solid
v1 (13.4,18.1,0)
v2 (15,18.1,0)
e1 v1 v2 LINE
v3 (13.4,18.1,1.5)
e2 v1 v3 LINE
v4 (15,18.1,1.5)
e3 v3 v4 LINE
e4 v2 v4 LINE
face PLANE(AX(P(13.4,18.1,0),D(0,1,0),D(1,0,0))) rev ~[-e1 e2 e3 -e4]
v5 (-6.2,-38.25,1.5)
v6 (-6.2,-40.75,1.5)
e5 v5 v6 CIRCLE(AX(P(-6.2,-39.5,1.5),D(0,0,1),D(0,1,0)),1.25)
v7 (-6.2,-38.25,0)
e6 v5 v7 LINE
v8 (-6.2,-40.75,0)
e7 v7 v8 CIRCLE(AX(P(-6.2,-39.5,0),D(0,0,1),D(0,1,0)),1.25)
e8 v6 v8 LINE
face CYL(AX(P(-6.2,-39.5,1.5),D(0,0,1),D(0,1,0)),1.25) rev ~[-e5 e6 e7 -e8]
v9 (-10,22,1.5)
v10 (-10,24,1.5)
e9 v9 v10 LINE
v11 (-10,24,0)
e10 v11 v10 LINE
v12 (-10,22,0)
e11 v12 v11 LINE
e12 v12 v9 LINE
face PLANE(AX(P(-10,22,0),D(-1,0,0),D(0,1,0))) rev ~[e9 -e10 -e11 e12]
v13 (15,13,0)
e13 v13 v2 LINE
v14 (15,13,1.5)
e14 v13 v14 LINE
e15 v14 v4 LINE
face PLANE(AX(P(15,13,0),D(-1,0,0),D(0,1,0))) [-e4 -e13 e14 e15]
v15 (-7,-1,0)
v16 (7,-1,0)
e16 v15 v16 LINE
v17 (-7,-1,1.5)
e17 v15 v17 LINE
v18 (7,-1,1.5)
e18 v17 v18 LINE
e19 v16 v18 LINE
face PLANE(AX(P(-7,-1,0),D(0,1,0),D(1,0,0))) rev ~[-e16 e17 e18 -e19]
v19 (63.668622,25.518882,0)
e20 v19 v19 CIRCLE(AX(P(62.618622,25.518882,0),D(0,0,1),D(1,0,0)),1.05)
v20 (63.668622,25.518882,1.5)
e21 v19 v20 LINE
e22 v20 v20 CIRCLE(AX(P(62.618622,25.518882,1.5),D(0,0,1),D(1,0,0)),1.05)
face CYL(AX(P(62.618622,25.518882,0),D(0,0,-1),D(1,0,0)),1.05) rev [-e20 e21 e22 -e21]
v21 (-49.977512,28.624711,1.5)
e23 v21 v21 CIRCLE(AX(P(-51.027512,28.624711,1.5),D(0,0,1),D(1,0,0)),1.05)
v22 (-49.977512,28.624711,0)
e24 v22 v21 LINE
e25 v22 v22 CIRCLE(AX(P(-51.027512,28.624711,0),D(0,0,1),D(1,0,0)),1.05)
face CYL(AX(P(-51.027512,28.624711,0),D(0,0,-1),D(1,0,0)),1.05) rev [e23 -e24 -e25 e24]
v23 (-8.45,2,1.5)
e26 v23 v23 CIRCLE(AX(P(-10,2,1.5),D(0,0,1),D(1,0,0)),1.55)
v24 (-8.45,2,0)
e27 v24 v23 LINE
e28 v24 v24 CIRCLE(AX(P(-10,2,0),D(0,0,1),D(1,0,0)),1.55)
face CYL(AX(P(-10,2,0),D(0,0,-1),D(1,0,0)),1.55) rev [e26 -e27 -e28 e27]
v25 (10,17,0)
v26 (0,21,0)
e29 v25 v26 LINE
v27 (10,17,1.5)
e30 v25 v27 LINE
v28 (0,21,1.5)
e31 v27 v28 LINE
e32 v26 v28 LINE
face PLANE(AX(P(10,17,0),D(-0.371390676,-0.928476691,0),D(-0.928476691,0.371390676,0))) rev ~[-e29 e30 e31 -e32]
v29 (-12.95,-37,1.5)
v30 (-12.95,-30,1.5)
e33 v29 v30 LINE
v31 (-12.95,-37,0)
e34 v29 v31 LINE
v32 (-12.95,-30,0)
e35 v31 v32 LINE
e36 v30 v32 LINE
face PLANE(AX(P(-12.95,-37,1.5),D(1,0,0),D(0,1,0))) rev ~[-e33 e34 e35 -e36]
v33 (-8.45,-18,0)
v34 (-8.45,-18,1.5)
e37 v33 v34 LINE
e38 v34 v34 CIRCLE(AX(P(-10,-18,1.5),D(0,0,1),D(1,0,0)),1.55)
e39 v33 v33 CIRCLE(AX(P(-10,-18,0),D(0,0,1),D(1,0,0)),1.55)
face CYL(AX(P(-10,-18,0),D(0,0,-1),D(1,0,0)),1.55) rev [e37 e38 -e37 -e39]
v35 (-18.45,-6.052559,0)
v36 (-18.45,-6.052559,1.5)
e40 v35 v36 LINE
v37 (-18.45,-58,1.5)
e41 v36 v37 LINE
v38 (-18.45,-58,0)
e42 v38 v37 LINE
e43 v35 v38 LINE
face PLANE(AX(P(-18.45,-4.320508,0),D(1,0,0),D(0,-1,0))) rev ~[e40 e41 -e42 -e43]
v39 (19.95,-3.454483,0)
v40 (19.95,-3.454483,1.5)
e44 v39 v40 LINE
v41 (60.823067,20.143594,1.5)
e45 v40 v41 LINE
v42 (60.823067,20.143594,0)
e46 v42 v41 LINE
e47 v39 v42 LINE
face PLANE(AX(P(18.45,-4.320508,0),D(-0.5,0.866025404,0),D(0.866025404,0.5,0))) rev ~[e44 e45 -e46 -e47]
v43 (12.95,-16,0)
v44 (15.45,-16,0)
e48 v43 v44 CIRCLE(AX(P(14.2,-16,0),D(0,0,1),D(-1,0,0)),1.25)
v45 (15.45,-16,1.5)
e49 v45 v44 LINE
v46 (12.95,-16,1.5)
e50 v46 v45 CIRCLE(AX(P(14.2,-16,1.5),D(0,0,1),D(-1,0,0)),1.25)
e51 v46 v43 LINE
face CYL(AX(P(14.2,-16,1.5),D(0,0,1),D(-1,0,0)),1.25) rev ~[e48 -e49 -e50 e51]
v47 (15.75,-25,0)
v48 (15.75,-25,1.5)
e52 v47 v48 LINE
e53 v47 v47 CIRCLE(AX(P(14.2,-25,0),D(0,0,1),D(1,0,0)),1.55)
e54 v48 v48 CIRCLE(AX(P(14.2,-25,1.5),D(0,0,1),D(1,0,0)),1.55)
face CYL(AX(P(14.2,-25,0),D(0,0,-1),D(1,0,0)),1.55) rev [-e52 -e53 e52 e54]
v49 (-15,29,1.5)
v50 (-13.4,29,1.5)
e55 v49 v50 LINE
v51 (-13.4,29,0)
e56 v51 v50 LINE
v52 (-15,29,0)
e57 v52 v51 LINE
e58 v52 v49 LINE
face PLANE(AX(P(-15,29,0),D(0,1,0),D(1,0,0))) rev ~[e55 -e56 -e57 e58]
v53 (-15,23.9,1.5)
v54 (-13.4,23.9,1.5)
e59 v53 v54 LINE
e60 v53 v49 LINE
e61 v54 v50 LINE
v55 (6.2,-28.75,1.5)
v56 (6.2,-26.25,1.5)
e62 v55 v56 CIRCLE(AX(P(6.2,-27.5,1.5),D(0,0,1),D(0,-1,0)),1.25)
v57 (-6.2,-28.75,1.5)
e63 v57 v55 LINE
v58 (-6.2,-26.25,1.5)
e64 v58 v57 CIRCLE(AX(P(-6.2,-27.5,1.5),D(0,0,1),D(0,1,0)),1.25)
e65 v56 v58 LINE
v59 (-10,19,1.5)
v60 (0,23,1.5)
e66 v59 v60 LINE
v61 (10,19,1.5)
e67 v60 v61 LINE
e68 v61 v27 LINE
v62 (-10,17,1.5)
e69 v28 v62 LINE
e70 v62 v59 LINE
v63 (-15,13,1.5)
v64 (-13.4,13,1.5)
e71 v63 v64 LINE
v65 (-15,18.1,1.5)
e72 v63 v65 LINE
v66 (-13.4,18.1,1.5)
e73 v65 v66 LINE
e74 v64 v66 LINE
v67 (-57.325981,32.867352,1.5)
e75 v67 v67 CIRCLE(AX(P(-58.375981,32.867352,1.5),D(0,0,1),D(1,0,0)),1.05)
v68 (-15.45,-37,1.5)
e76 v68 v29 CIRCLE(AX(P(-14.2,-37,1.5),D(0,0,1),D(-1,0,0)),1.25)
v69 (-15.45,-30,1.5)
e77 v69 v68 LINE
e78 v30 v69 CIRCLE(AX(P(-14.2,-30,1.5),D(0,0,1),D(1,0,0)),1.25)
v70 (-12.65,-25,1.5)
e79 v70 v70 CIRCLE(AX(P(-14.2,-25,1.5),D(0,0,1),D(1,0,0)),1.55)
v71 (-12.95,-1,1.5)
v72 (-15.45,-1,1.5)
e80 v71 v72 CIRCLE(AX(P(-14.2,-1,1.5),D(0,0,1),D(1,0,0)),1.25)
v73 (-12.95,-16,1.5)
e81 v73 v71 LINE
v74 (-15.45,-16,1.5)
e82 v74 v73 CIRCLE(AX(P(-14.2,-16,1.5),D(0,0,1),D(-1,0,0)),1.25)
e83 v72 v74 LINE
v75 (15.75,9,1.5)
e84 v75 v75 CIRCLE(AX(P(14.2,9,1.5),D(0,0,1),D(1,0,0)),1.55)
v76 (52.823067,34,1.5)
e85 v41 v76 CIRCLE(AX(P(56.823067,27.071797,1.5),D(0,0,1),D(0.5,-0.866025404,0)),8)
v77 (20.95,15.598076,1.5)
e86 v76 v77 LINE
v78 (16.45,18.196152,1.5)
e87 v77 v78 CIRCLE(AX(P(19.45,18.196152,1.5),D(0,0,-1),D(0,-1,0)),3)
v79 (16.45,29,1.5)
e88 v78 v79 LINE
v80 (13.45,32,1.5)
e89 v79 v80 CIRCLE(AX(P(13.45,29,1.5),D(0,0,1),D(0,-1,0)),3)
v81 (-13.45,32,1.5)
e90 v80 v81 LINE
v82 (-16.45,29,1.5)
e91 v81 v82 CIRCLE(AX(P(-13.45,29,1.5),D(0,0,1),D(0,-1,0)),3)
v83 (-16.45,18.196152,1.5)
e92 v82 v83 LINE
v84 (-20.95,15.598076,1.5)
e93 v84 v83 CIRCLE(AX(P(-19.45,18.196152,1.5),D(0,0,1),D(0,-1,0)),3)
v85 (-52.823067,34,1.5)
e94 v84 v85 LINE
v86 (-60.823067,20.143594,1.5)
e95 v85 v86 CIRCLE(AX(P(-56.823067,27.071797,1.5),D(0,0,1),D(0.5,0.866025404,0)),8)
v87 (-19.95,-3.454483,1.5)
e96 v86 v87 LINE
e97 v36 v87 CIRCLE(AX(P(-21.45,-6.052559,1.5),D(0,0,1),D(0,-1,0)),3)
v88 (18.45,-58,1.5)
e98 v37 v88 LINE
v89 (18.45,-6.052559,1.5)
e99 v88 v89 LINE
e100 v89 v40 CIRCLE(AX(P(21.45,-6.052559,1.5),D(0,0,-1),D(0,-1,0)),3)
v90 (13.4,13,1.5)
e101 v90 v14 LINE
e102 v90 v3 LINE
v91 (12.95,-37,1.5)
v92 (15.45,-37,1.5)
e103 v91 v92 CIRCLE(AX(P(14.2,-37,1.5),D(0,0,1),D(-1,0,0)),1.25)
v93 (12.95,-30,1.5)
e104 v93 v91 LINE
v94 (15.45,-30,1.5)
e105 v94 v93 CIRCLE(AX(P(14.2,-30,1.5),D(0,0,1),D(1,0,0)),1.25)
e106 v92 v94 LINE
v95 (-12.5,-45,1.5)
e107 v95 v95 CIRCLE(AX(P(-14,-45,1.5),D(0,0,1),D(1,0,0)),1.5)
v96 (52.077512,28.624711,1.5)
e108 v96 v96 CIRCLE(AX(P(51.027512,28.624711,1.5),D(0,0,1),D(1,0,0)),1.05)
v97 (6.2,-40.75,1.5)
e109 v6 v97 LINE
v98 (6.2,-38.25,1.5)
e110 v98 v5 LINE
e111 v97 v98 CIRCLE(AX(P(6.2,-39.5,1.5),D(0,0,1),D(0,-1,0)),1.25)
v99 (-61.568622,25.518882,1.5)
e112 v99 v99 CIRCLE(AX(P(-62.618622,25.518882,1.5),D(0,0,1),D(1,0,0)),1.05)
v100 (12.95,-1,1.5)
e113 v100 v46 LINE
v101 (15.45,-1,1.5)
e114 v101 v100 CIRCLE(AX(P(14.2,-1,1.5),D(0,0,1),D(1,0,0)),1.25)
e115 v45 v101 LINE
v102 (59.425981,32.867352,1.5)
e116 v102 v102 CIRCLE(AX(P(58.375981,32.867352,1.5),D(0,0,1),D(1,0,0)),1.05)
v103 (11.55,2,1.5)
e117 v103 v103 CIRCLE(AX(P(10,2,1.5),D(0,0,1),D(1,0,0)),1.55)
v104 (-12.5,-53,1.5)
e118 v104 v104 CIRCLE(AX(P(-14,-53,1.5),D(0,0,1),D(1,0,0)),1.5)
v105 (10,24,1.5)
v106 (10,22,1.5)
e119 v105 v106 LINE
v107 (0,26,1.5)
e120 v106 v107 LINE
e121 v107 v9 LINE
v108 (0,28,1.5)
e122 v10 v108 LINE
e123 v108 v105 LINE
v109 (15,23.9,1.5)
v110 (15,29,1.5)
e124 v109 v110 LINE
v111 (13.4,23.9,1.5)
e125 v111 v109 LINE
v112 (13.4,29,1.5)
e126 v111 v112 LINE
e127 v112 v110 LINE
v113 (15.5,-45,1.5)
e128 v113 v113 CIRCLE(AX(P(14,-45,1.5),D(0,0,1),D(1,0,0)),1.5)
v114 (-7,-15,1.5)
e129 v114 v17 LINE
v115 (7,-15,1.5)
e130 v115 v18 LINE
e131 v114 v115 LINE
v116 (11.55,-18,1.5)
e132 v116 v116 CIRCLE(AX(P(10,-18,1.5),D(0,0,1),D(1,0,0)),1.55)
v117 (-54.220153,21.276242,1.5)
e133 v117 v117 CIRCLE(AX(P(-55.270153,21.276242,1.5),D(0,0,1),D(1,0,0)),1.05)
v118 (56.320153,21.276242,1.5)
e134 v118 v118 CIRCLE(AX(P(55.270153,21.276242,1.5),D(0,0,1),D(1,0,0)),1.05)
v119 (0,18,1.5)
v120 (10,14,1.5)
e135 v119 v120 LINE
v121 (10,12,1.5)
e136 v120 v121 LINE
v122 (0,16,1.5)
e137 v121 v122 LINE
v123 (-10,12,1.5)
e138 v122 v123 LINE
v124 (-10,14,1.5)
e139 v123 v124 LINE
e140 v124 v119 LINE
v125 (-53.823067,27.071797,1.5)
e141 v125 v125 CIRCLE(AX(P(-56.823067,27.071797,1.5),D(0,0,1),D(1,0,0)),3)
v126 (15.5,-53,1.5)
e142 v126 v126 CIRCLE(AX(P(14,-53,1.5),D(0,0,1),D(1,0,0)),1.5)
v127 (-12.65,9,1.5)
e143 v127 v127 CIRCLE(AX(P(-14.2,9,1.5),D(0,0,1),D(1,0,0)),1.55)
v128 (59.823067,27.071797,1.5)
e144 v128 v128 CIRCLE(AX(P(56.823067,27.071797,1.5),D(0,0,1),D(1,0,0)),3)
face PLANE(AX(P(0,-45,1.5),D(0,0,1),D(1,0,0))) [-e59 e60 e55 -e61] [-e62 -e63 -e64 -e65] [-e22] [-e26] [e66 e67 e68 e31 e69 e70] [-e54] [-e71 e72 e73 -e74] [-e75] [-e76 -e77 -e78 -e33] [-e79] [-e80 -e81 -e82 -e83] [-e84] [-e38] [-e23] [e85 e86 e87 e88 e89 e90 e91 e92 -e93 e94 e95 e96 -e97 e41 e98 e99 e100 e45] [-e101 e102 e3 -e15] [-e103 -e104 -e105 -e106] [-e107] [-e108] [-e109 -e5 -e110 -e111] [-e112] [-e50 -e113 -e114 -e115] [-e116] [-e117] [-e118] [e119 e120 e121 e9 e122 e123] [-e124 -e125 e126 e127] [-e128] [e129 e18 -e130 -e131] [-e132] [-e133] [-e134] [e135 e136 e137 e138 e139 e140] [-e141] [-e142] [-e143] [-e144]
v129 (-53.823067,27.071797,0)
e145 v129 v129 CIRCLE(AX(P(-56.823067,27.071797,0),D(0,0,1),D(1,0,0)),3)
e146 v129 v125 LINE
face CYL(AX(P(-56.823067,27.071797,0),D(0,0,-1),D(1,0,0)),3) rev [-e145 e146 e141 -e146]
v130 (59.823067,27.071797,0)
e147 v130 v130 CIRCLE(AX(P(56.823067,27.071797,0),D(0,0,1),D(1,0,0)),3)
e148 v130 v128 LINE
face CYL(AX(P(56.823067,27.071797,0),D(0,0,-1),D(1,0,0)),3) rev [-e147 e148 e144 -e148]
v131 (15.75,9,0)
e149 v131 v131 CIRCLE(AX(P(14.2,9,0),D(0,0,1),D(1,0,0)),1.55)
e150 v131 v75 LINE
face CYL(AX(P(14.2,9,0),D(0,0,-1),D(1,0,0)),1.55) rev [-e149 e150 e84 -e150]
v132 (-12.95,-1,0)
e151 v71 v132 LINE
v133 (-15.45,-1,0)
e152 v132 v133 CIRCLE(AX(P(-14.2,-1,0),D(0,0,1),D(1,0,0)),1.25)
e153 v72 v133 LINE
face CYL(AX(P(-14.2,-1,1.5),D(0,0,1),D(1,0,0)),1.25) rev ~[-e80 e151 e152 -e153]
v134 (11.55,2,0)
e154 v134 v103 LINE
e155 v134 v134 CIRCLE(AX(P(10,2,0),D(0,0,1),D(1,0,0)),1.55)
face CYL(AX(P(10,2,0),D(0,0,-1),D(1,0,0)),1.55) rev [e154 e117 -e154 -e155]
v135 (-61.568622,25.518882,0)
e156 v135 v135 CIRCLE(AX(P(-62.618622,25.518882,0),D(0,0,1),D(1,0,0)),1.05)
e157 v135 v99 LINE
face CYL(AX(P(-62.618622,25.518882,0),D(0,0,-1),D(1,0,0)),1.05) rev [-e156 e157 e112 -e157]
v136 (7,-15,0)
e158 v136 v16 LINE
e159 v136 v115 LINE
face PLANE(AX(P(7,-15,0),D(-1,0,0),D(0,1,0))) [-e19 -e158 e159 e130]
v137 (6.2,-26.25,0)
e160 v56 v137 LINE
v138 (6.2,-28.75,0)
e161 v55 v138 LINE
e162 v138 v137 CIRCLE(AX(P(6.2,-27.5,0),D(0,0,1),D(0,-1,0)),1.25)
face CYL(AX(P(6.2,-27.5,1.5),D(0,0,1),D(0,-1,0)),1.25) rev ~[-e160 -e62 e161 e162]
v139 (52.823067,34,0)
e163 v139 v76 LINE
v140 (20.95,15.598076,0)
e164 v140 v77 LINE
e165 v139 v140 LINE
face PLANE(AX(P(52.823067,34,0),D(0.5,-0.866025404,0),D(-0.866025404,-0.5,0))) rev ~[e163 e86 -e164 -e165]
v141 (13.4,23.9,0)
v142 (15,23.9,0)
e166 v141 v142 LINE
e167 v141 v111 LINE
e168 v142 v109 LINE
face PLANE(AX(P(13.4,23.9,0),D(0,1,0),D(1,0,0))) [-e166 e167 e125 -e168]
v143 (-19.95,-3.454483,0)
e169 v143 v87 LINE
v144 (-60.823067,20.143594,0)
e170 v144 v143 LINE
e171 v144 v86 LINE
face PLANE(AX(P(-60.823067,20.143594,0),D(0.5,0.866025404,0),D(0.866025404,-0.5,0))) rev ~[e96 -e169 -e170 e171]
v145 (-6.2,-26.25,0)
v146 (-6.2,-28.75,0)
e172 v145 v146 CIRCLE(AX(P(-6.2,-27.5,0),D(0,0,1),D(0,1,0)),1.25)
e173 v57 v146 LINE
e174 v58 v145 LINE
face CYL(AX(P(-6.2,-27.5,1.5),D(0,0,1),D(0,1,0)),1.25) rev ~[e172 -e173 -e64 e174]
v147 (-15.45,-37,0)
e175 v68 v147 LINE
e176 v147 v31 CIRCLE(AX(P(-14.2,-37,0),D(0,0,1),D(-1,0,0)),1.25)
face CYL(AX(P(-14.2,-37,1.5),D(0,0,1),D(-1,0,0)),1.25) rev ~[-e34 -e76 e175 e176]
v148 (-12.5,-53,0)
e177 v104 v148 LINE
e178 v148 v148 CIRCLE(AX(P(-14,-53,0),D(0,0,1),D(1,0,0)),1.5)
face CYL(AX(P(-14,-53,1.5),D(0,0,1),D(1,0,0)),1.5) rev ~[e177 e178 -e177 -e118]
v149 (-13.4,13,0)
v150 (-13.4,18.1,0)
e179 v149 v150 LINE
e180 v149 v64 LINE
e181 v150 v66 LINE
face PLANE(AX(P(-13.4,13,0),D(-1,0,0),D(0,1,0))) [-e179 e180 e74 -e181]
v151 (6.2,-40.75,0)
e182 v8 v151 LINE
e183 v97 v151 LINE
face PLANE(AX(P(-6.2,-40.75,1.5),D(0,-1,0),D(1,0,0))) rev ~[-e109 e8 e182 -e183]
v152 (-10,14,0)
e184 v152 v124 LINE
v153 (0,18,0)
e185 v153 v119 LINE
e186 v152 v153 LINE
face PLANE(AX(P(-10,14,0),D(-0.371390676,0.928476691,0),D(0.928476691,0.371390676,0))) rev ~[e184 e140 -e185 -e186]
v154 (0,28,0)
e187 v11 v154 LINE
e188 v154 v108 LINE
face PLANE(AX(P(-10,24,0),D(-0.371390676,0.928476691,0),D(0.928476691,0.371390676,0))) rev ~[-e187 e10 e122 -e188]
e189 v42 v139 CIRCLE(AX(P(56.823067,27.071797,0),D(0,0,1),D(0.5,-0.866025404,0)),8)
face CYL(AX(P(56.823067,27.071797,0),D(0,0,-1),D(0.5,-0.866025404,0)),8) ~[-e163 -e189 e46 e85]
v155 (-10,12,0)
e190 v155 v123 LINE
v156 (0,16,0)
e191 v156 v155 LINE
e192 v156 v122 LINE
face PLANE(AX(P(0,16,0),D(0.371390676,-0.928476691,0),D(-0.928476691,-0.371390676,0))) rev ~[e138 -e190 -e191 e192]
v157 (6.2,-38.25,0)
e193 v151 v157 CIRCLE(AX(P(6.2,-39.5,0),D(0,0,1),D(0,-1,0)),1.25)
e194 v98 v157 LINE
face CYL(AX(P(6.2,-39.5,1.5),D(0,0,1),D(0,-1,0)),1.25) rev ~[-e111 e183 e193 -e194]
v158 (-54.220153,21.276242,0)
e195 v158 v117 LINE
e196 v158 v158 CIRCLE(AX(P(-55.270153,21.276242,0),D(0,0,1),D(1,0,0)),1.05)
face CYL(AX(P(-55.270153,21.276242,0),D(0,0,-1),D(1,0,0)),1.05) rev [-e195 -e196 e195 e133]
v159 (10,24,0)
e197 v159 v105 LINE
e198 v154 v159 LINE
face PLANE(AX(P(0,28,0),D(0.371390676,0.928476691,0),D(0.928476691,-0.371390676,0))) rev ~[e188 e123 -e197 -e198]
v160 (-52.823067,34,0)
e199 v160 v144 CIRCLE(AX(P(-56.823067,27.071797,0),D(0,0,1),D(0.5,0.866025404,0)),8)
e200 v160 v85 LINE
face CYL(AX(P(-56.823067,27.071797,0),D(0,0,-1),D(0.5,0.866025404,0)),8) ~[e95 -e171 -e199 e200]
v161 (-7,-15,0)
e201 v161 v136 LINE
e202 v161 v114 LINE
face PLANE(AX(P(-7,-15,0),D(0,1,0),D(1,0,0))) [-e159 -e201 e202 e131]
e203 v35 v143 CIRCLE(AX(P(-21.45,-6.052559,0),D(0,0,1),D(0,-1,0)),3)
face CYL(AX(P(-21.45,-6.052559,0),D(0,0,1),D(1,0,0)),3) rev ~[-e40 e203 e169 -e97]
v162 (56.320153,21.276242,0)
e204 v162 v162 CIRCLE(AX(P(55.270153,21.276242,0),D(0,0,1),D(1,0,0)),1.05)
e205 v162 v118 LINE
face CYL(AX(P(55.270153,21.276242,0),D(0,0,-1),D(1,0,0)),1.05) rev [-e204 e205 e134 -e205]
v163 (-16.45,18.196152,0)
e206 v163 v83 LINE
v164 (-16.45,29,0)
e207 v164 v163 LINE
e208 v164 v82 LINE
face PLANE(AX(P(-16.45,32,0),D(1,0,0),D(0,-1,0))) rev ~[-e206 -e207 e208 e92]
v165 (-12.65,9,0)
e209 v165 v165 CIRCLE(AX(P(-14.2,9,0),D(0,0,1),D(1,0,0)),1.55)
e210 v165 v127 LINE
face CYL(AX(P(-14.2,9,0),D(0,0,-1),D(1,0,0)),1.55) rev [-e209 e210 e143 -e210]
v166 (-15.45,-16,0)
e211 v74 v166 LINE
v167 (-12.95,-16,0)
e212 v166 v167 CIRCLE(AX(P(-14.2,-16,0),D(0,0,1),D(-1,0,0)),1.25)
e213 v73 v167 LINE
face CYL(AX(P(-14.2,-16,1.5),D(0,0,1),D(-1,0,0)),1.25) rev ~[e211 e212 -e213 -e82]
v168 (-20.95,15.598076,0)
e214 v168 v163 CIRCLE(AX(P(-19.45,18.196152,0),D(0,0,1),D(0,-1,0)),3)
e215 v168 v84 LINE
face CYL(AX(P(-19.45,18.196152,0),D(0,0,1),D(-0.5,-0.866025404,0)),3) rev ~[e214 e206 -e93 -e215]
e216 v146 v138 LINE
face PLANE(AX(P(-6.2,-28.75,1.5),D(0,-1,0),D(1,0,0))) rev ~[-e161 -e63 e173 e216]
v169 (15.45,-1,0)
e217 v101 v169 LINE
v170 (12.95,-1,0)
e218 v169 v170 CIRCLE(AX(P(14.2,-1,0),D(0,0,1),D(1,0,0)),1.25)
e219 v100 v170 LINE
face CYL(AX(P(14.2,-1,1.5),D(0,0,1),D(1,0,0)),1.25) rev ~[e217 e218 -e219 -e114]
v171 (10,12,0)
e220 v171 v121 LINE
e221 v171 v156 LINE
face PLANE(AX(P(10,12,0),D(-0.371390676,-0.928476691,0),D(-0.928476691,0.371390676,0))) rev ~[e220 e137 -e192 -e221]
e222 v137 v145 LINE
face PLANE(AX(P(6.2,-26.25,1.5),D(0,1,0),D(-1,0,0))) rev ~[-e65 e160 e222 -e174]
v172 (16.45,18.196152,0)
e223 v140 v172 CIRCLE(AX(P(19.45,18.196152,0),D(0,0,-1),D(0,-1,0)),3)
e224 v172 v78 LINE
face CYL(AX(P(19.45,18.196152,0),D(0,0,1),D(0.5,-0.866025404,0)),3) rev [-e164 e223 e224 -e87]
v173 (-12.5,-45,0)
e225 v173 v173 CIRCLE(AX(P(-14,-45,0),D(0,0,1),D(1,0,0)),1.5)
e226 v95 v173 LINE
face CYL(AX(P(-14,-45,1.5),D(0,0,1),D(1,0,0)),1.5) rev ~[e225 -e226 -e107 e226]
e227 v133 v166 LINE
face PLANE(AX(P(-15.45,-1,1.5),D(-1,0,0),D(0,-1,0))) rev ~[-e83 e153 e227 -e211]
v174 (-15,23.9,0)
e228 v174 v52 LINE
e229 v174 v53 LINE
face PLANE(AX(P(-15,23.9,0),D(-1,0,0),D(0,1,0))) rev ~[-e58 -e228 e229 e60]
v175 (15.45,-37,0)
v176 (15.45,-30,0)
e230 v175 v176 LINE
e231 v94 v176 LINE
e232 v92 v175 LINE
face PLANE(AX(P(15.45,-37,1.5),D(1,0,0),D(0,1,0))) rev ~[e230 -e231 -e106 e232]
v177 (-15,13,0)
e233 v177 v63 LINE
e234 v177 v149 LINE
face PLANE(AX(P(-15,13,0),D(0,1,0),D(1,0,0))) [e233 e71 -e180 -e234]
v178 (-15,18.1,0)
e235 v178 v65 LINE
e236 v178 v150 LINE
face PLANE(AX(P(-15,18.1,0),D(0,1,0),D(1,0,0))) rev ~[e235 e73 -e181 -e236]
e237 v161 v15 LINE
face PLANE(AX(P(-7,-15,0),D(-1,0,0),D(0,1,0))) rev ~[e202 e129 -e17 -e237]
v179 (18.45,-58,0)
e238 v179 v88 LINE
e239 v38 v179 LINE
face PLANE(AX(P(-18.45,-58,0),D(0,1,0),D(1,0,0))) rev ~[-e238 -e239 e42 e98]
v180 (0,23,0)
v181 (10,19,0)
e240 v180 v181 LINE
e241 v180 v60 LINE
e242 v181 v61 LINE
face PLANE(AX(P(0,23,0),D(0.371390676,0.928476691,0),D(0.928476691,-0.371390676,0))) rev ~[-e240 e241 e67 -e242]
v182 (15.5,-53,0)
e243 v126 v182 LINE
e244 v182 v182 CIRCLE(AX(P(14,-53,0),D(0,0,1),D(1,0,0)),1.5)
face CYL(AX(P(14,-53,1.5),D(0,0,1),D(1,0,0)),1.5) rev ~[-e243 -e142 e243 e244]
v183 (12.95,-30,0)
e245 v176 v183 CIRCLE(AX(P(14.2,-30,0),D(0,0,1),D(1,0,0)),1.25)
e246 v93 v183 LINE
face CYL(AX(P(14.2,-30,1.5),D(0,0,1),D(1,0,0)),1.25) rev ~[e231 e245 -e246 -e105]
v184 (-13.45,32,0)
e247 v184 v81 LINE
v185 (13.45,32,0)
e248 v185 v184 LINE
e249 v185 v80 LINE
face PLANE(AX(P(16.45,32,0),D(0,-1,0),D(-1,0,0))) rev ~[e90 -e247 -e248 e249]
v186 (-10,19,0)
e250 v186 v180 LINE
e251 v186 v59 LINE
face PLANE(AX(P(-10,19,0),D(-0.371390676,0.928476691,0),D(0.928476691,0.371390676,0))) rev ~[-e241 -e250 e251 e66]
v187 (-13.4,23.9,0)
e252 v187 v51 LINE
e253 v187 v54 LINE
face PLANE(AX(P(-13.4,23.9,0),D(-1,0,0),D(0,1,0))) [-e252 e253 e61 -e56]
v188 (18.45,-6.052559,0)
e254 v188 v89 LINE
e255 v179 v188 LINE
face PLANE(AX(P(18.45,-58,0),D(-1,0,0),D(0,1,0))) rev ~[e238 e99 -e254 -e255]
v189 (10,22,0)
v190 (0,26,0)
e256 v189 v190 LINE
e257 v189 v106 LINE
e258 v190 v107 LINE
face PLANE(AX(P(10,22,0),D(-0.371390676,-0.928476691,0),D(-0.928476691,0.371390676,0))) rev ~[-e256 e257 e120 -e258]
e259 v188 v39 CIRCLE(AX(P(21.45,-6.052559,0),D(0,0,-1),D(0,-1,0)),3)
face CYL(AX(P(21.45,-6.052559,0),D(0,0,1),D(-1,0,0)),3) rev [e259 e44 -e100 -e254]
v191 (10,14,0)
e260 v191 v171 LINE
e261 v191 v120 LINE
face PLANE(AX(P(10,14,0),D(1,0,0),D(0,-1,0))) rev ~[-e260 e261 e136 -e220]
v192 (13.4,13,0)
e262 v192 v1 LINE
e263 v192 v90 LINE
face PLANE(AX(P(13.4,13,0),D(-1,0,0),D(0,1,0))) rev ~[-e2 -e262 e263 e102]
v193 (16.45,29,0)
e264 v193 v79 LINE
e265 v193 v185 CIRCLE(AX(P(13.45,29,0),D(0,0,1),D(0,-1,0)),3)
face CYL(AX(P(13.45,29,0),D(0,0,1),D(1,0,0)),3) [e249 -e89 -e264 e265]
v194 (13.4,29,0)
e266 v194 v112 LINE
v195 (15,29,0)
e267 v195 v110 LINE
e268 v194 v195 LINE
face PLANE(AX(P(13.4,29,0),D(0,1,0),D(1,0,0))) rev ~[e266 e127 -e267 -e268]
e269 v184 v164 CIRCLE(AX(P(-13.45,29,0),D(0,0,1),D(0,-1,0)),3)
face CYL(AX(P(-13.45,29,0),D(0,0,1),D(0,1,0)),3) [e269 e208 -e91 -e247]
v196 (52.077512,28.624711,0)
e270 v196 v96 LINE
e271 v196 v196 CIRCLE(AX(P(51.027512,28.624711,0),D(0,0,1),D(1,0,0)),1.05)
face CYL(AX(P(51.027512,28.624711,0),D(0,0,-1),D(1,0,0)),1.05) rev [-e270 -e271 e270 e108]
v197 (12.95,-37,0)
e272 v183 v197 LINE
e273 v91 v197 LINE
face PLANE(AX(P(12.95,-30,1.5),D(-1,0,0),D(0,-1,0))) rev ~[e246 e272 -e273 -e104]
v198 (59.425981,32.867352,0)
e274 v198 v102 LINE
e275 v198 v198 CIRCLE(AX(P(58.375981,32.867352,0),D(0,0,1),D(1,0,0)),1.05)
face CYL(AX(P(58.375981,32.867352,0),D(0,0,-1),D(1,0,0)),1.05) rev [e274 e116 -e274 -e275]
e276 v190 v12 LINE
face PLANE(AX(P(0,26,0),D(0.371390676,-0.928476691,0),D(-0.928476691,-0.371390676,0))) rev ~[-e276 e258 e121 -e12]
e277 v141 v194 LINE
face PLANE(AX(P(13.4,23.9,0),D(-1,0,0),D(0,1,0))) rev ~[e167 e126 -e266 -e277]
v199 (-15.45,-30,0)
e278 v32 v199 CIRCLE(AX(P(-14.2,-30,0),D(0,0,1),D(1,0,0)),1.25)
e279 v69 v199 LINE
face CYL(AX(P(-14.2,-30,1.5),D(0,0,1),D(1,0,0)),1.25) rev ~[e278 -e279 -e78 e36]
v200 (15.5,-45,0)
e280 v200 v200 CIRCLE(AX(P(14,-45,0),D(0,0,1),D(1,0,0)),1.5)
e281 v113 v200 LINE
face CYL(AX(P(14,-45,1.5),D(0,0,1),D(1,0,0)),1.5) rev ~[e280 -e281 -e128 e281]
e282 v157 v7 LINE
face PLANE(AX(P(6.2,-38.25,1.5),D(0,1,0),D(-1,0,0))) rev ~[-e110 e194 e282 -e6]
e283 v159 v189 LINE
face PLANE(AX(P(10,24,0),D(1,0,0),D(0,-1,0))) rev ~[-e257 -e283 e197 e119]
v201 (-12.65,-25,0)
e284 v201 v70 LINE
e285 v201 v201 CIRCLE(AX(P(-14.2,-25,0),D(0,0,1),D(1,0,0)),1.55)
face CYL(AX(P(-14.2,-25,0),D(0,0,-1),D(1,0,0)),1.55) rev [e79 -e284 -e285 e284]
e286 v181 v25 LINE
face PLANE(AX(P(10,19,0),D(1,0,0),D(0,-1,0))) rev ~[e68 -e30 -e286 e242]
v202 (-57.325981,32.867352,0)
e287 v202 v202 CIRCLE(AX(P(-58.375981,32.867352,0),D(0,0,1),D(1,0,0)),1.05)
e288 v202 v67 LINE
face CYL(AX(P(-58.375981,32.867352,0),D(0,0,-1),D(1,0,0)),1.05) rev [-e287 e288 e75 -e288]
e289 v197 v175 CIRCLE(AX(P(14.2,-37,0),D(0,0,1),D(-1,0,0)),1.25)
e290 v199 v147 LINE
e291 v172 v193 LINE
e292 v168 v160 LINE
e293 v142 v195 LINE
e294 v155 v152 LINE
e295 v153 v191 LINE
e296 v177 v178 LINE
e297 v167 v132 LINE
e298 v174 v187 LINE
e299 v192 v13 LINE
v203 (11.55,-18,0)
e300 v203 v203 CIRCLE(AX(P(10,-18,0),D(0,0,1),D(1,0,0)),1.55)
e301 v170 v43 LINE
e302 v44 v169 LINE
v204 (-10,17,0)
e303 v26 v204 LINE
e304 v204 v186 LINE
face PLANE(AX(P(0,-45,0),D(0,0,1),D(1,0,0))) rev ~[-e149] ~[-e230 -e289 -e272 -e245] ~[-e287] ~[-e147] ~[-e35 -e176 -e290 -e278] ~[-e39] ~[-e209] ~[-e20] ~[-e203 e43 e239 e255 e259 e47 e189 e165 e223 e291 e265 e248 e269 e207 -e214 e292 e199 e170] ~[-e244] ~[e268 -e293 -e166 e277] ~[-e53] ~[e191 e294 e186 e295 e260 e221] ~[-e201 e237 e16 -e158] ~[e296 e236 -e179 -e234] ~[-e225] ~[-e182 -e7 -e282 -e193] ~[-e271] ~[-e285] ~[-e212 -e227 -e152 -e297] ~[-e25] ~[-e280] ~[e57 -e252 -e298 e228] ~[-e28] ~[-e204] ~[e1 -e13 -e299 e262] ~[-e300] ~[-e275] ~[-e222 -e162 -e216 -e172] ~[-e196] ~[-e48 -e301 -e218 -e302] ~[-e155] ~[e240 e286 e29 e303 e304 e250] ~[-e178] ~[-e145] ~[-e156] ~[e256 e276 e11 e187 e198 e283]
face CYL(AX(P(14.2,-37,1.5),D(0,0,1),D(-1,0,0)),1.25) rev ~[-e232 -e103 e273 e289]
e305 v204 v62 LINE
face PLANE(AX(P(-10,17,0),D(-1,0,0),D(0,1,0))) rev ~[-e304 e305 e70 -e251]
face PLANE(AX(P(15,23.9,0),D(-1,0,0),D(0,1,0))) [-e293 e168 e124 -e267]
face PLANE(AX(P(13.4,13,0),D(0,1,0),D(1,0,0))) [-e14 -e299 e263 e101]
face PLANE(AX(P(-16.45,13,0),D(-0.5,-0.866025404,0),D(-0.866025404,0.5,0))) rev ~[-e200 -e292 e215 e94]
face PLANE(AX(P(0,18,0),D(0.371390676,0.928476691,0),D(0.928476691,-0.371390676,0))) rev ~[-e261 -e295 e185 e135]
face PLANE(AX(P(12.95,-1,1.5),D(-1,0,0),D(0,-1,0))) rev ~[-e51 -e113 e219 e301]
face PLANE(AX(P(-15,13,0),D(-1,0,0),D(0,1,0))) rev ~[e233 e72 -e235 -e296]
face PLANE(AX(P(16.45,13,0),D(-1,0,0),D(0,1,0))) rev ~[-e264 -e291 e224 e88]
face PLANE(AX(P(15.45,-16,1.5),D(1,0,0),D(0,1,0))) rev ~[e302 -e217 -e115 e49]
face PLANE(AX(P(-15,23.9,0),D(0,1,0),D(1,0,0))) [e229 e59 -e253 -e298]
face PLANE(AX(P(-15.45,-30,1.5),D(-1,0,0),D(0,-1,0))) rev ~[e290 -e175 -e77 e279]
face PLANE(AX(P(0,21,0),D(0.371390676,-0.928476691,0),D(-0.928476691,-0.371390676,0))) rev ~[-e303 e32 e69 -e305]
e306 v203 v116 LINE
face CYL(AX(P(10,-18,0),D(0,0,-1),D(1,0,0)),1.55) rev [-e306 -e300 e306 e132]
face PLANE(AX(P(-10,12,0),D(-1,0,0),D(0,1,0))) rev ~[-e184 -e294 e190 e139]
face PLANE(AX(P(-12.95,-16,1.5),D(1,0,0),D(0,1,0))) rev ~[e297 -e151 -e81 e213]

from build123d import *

# Parameters (mm, degrees)
F0_R     = 1.55
F0_W     = 1.6
F0_H     = 5.1
F0_W_2   = 14
F0_H_2   = 14
F0_R_2   = 1.05
F0_R_3   = 3
F1_DEPTH = 1.5
F2_R     = 3
F3_R     = 1.5
F4_DEPTH = 1.501


with BuildPart() as f1:
    # F0 (on Top) → F1 (new body)
    with BuildSketch(Plane.XY):
        Polygon((18.45, -32), (16.45, -32), (-16.45, -32), (-18.45, -32), (-18.45, -58), (18.45, -58), align=None)
        Polygon((-16.45, -32), (16.45, -32), (16.45, -5.4752086141), (16.45, 13), (16.45, 32), (-16.45, 32), (-16.45, 13), (-16.45, -5.4752086141), align=None)
        with Locations((-14.2, -25)):
            Circle(F0_R, mode=Mode.SUBTRACT)
        with Locations((-10, -18)):
            Circle(F0_R, mode=Mode.SUBTRACT)
        with Locations((14.2, -25)):
            Circle(F0_R, mode=Mode.SUBTRACT)
        with Locations((10, -18)):
            Circle(F0_R, mode=Mode.SUBTRACT)
        with Locations((-10, 2)):
            Circle(F0_R, mode=Mode.SUBTRACT)
        with Locations((-14.2, 9)):
            Circle(F0_R, mode=Mode.SUBTRACT)
        with Locations((-14.2, 15.55)):
            Rectangle(F0_W, F0_H, mode=Mode.SUBTRACT)
        with Locations((-14.2, 26.45)):
            Rectangle(F0_W, F0_H, mode=Mode.SUBTRACT)
        with Locations((0, -8)):
            Rectangle(F0_W_2, F0_H_2, mode=Mode.SUBTRACT)
        with Locations((10, 2)):
            Circle(F0_R, mode=Mode.SUBTRACT)
        with Locations((14.2, 9)):
            Circle(F0_R, mode=Mode.SUBTRACT)
        Polygon((-10, 14), (0, 18), (10, 14), (10, 12), (0, 16), (-10, 12), align=None, mode=Mode.SUBTRACT)
        with Locations((14.2, 15.55)):
            Rectangle(F0_W, F0_H, mode=Mode.SUBTRACT)
        Polygon((-10, 19), (0, 23), (10, 19), (10, 17), (0, 21), (-10, 17), align=None, mode=Mode.SUBTRACT)
        Polygon((-10, 24), (0, 28), (10, 24), (10, 22), (0, 26), (-10, 22), align=None, mode=Mode.SUBTRACT)
        with Locations((14.2, 26.45)):
            Rectangle(F0_W, F0_H, mode=Mode.SUBTRACT)
        Polygon((16.45, -5.4752086141), (16.45, -32), (18.45, -32), (18.45, -4.3205080757), align=None)
        Polygon((-18.45, -32), (-16.45, -32), (-16.45, -5.4752086141), (-18.45, -4.3205080757), align=None)
        with BuildLine():
            Line((16.45, 13), (16.45, -5.4752086141))
            Line((16.45, -5.4752086141), (18.45, -4.3205080757))
            Line((18.45, -4.3205080757), (60.8230669589, 20.1435935394))
            ThreePointArc((60.8230669589, 20.1435935394), (63.7512701892, 31.0717967697), (52.8230669589, 34))
            Line((52.8230669589, 34), (16.45, 13))
        make_face()
        with Locations((55.2701526883, 21.276241812)):
            Circle(F0_R_2, mode=Mode.SUBTRACT)
        with Locations((51.0275120012, 28.6247110403)):
            Circle(F0_R_2, mode=Mode.SUBTRACT)
        with Locations((62.6186219167, 25.5188824991)):
            Circle(F0_R_2, mode=Mode.SUBTRACT)
        with Locations((56.8230669589, 27.0717967697)):
            Circle(F0_R_3, mode=Mode.SUBTRACT)
        with Locations((58.3759812296, 32.8673517275)):
            Circle(F0_R_2, mode=Mode.SUBTRACT)
        with BuildLine():
            Line((-18.45, -4.3205080757), (-16.45, -5.4752086141))
            Line((-16.45, -5.4752086141), (-16.45, 13))
            Line((-16.45, 13), (-52.8230669589, 34))
            ThreePointArc((-52.8230669589, 34), (-63.7512701892, 31.0717967697), (-60.8230669589, 20.1435935394))
            Line((-60.8230669589, 20.1435935394), (-18.45, -4.3205080757))
        make_face()
        with Locations((-55.2701526883, 21.276241812)):
            Circle(F0_R_2, mode=Mode.SUBTRACT)
        with Locations((-62.6186219167, 25.5188824991)):
            Circle(F0_R_2, mode=Mode.SUBTRACT)
        with Locations((-56.8230669589, 27.0717967697)):
            Circle(F0_R_3, mode=Mode.SUBTRACT)
        with Locations((-51.0275120012, 28.6247110403)):
            Circle(F0_R_2, mode=Mode.SUBTRACT)
        with Locations((-58.3759812296, 32.8673517275)):
            Circle(F0_R_2, mode=Mode.SUBTRACT)
    extrude(amount=F1_DEPTH)

    # F2
    f2_edges = [f1.edges().sort_by_distance(p)[0] for p in [
        (-16.45, 13, 0.75),
        (16.45, 13, 0.75),
        (18.45, -4.320508, 0.75),
        (-18.45, -4.320508, 0.75),
        (16.45, 32, 0.75),
        (-16.45, 32, 0.75),
    ]]
    fillet(f2_edges, radius=F2_R)

    # F3 (on face) → F4 (cut, through all)
    with BuildSketch(Plane.XY.offset(1.5)):
        with BuildLine():
            ThreePointArc((-12.95, -1), (-14.2, 0.25), (-15.45, -1))
            Line((-15.45, -1), (-15.45, -16))
            ThreePointArc((-15.45, -16), (-14.2, -17.25), (-12.95, -16))
            Line((-12.95, -16), (-12.95, -1))
        make_face()
        with BuildLine():
            ThreePointArc((15.45, -1), (14.2, 0.25), (12.95, -1))
            Line((12.95, -1), (12.95, -16))
            ThreePointArc((12.95, -16), (14.2, -17.25), (15.45, -16))
            Line((15.45, -16), (15.45, -1))
        make_face()
        with BuildLine():
            ThreePointArc((-12.95, -30), (-14.2, -28.75), (-15.45, -30))
            Line((-15.45, -30), (-15.45, -37))
            ThreePointArc((-15.45, -37), (-14.2, -38.25), (-12.95, -37))
            Line((-12.95, -37), (-12.95, -30))
        make_face()
        with BuildLine():
            ThreePointArc((15.45, -30), (14.2, -28.75), (12.95, -30))
            Line((12.95, -30), (12.95, -37))
            ThreePointArc((12.95, -37), (14.2, -38.25), (15.45, -37))
            Line((15.45, -37), (15.45, -30))
        make_face()
        with Locations((-14, -45)):
            Circle(F3_R)
        with Locations((-14, -53)):
            Circle(F3_R)
        with Locations((14, -45)):
            Circle(F3_R)
        with Locations((14, -53)):
            Circle(F3_R)
        with BuildLine():
            ThreePointArc((-6.2, -26.25), (-7.45, -27.5), (-6.2, -28.75))
            Line((-6.2, -28.75), (6.2, -28.75))
            ThreePointArc((6.2, -28.75), (7.45, -27.5), (6.2, -26.25))
            Line((6.2, -26.25), (-6.2, -26.25))
        make_face()
        with BuildLine():
            ThreePointArc((-6.2, -38.25), (-7.45, -39.5), (-6.2, -40.75))
            Line((-6.2, -40.75), (6.2, -40.75))
            ThreePointArc((6.2, -40.75), (7.45, -39.5), (6.2, -38.25))
            Line((6.2, -38.25), (-6.2, -38.25))
        make_face()
    extrude(amount=-F4_DEPTH, mode=Mode.SUBTRACT)


solid = f1.part
